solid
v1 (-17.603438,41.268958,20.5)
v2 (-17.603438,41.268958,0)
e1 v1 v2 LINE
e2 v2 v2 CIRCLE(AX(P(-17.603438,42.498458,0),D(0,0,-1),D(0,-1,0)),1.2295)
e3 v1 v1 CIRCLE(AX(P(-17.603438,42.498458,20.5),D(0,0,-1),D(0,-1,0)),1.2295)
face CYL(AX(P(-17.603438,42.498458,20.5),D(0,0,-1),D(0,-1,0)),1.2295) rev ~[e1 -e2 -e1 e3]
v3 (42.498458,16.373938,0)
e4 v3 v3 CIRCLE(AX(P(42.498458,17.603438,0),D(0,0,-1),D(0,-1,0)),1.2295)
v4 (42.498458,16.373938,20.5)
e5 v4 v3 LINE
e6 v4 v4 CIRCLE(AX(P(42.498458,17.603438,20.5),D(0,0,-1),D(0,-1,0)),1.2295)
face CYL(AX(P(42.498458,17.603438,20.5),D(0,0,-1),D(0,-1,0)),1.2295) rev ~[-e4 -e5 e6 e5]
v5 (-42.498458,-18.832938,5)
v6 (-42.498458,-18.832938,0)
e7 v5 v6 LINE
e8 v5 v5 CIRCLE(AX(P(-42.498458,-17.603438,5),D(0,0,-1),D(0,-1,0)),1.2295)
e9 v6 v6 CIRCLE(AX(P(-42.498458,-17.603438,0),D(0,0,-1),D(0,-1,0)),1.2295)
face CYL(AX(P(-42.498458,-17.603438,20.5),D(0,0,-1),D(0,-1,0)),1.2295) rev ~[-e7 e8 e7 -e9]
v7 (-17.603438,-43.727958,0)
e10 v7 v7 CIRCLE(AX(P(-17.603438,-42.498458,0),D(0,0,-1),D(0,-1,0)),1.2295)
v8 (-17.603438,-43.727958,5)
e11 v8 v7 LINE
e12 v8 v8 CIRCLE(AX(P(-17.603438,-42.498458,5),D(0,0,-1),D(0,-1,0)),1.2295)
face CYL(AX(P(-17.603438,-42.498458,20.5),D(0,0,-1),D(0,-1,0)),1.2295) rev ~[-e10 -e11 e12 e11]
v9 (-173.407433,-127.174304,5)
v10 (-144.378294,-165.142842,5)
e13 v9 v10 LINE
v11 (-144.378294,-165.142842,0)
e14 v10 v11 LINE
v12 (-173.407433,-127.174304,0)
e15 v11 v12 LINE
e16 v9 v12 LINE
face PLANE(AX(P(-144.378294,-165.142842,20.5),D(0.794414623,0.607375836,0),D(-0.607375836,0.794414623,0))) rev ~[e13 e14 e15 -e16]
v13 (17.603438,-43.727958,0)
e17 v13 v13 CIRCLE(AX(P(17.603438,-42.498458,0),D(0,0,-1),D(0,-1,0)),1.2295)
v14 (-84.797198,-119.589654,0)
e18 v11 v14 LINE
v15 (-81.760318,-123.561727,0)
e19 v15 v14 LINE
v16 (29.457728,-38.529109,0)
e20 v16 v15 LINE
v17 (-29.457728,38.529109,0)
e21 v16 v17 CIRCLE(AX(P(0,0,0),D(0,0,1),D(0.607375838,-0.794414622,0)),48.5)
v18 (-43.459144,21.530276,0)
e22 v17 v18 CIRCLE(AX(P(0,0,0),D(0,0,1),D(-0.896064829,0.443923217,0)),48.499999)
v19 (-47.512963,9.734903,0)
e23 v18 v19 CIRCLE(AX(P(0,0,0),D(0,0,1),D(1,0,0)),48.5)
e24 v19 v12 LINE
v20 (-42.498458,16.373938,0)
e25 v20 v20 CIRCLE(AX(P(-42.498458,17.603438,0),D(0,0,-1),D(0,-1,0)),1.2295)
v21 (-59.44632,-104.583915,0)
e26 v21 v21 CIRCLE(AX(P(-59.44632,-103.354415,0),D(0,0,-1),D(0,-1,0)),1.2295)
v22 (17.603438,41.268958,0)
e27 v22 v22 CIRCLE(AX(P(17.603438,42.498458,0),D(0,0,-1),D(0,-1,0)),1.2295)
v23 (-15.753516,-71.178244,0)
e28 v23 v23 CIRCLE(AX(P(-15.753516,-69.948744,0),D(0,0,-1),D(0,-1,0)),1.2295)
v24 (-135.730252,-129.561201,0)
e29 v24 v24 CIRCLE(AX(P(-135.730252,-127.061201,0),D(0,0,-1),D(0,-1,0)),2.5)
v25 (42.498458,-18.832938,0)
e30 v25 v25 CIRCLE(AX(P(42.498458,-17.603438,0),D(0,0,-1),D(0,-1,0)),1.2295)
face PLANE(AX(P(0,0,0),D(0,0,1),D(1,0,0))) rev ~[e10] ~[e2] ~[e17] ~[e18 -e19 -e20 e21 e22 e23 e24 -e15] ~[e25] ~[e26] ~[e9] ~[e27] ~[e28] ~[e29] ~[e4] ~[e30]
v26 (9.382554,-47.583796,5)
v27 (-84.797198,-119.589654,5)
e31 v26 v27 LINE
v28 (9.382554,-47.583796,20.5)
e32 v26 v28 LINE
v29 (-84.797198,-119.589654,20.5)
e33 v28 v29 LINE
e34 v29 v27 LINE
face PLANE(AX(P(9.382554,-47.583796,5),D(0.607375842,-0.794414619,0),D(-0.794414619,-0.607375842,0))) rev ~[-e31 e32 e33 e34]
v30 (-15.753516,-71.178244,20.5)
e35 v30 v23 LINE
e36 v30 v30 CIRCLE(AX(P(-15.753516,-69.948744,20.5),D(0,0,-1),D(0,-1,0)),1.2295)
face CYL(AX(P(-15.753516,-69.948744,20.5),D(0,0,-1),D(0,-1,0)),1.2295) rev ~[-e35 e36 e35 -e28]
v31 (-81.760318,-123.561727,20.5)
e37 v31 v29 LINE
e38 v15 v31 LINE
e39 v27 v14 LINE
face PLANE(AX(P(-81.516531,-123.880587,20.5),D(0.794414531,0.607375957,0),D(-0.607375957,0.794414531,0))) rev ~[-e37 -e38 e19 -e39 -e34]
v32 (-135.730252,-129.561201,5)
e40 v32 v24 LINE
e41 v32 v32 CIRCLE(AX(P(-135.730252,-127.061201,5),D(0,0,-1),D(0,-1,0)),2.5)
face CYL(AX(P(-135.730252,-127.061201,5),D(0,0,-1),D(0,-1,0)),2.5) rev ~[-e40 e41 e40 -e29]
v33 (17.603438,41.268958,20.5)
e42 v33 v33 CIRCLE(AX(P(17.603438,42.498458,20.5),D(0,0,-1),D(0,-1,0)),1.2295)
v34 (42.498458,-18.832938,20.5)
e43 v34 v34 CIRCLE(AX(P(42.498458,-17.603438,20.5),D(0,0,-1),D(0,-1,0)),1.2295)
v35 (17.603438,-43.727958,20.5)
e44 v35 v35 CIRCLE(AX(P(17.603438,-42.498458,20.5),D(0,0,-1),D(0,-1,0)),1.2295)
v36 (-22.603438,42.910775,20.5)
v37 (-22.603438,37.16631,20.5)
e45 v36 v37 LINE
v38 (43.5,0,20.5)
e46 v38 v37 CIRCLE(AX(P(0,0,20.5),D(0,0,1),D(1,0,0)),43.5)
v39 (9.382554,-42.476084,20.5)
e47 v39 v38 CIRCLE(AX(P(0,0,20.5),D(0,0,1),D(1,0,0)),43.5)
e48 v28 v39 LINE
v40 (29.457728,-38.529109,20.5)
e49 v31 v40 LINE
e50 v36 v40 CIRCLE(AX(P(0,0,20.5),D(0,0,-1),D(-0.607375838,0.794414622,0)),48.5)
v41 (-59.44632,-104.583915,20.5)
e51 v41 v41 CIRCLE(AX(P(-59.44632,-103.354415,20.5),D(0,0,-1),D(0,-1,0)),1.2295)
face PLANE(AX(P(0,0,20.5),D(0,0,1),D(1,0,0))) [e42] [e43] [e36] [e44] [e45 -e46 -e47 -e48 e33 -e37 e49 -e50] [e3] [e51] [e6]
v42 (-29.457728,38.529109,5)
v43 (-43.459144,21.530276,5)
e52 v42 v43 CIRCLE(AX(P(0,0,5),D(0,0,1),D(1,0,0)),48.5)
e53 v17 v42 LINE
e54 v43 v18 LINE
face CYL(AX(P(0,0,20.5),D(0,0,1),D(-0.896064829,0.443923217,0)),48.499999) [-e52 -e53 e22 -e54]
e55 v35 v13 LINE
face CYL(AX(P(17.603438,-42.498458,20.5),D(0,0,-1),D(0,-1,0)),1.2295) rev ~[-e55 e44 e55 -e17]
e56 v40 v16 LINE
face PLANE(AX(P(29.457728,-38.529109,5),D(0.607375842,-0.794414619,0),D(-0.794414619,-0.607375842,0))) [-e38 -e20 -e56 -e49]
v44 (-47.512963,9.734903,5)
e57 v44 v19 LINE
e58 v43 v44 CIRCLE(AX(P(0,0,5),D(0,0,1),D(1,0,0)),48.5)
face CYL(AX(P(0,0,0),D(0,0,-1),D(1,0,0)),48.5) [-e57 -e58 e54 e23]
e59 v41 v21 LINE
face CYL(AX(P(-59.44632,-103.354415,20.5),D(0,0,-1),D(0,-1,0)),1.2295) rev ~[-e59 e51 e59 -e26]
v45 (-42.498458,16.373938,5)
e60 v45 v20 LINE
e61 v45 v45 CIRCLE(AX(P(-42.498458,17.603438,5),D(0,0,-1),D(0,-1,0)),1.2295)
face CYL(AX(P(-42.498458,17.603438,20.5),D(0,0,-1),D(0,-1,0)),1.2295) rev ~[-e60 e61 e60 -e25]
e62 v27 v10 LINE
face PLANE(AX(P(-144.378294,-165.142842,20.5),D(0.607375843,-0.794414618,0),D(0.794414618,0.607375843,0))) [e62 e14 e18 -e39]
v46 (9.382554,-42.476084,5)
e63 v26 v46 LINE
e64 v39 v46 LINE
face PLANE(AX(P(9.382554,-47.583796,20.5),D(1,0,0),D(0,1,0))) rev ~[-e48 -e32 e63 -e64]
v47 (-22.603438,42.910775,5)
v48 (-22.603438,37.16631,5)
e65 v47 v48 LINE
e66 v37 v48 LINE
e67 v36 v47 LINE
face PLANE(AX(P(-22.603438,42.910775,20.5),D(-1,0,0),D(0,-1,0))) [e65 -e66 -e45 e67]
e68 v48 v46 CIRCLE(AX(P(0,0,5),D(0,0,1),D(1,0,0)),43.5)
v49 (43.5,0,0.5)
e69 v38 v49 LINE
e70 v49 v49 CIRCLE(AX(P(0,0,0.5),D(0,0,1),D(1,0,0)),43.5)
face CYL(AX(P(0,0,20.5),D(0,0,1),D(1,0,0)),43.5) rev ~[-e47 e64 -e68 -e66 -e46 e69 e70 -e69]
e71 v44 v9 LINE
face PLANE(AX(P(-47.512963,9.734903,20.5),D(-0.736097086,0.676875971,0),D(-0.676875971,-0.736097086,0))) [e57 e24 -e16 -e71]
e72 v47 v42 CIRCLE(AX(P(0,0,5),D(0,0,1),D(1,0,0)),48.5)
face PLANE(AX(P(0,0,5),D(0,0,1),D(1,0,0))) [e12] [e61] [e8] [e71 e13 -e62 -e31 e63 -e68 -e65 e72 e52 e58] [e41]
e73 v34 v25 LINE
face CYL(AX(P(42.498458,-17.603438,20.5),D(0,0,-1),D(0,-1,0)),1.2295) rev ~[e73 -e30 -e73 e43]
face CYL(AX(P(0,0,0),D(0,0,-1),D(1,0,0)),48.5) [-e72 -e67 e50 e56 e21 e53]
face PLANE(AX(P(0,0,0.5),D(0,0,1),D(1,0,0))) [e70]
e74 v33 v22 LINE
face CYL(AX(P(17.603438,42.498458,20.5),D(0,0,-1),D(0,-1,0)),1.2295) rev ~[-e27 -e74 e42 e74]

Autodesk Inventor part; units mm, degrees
ref_plane "YZ Plane" through (0, 0, 0) normal (1, 0, 0) x (0, 1, 0)
ref_plane "XZ Plane" through (0, 0, 0) normal (0, 1, 0) x (-1, 0, 0)
ref_plane "XY Plane" through (0, 0, 0) normal (0, 0, 1) x (1, 0, 0)
sketch "スケッチ1" plane through (0, 0, 0) normal (0, 0, 1) x (1, 0, 0)
  circle A0 centre (0, 0) radius 48.5
  circle A1 centre (0, 0) radius 46
  dimension "d0" = 97
  dimension "d1" = 92
extrude "押し出し1" add sketch "スケッチ1" along normal blind 20.5 contours A0 | A1
sketch "スケッチ2" plane through (0, 0, 20.5) normal (0, 0, 1) x (1, 0, 0)
  circle A0 centre (0, 0) radius 46
  line L0 (0, 0) -> (0, 59.211017)
  line L1 (0, 0) -> (-21.860946, 52.776992)
  line L2 (0, 0) -> (27.822621, 47.858094)
  point P0 (-17.603438, 42.498458)
  point P1 (-42.498458, 17.603438)
  point P2 (-42.498458, -17.603438)
  point P3 (-17.603438, -42.498458)
  point P4 (17.603438, -42.498458)
  point P5 (42.498458, -17.603438)
  point P6 (42.498458, 17.603438)
  point P7 (17.603438, 42.498458)
  dimension "d4" = 92
  dimension "d5" = 22.5
  dimension "d8" = 360
hole "穴1" at (-17.603438, 42.498458, 20.5) at (-42.498458, 17.603438, 20.5) at (-42.498458, -17.603438, 20.5) at (-17.603438, -42.498458, 20.5) at (17.603438, -42.498458, 20.5) at (42.498458, -17.603438, 20.5) at (42.498458, 17.603438, 20.5) at (17.603438, 42.498458, 20.5) direction (0, 0, -1) diameter 2.459 end through all
sketch "スケッチ3" plane through (0, 0, 20.5) normal (0, 0, 1) x (1, 0, 0)
  circle A0 centre (0, 0) radius 43.5
  dimension "d17" = 87
extrude "押し出し2" cut sketch "スケッチ3" against normal blind 20
sketch "スケッチ4" plane through (0, 0, 0) normal (0, 0, -1) x (-1, 0, 0)
  line L0 (0, 0) -> (0, -80.557014)
  circle A0 centre (0, 0) radius 48.5
  line L1 (-29.457728, -38.529109) -> (145.313488, -172.151794)
  line L2 (29.457728, 38.529109) -> (204.228945, -95.093576)
  line L3 (145.313488, -172.151794) -> (204.228945, -95.093576)
  point P0 (29.457728, 38.529109)
  dimension "d21" = 48.5
  dimension "d23" = 97
  dimension "d24" = 220
  dimension "d25" = 220
  dimension "d56" = 52.6
extrude "押し出し3" add sketch "スケッチ4" against normal blind 5 contours A0 L2 L3 L1 L0 | L0 L1 A0
sketch "スケッチ5" plane through (0, 0, 5) normal (0, 0, 1) x (1, 0, 0)
  line L0 (-29.457728, 38.529109) -> (29.457728, -38.529109)
  line L1 (-204.228945, -95.093576) -> (-145.313488, -172.151794)
  line L2 (29.457728, -38.529109) -> (-145.313488, -172.151794)
  line L3 (-145.313488, -172.151794) -> (-204.228945, -95.093576)
  line L4 (-204.228945, -95.093576) -> (-29.457728, 38.529109)
  line L5 (-26.420849, 34.557036) -> (-201.192066, -99.065649)
  line L6 (26.420849, -34.557036) -> (-148.350367, -168.179721)
  line L7 (-200.256872, -92.056696) -> (-141.341415, -169.114915)
  circle A0 centre (0, 0) radius 48.5
  circle A1 centre (0, 0) radius 43.5
  point P0 (-116.843336, -28.282233)
  point P1 (-60.964759, -101.368378)
  point P2 (-57.92788, -105.340451)
  point P3 (-174.771217, -133.622685)
  point P4 (-170.799143, -130.585806)
  point P5 (-174.771217, -133.622685)
  point P6 (-43.459144, 21.530276)
  point P7 (9.382554, -47.583796)
  point P8 (-144.378294, -165.142842)
  point P9 (-197.219992, -96.02877)
  dimension "d29" = 5
  dimension "d30" = 5
  dimension "d32" = 5
  dimension "d33" = 5
extrude "押し出し4" add sketch "スケッチ5" along normal blind 15.5 contours A0 L5 L7 L4 | L7 L5 L1 L4 | L7 L6 L1 L5 | L2 L7 L6 A0 | L7 L2 L1 L6
sketch "スケッチ6" plane through (0, 0, 20.5) normal (0, 0, 1) x (1, 0, 0)
  line L0 (-204.228945, -95.093576) -> (-145.313488, -172.151794)
  arc A0 (29.457728, -38.529109) -> (-29.457728, 38.529109) centre (0, 0) ccw
  line L1 (-29.457728, 38.529109) -> (-204.228945, -95.093576)
  line L2 (-145.313488, -172.151794) -> (29.457728, -38.529109)
  point P0 (-15.753516, -69.948744)
  point P1 (-71.632093, 3.137401)
  point P2 (-59.44632, -103.354415)
  point P3 (-115.324897, -30.26827)
  point P4 (-103.139124, -136.760086)
  point P5 (-159.017701, -63.673941)
  point P6 (-174.771217, -133.622685)
  point P7 (38.529109, 29.457728)
  point P8 (9.382554, -47.583796)
  dimension "d36" = 268.5
  dimension "d37" = 55
  dimension "d38" = 55
  dimension "d39" = 55
  dimension "d40" = 2.5
  dimension "d41" = 2.5
  dimension "d42" = 2.5
  dimension "d43" = 55
  dimension "d44" = 55
  dimension "d45" = 55
  dimension "d46" = 2.5
  dimension "d47" = 2.5
  dimension "d48" = 2.5
hole "穴2" at (-15.753516, -69.948744, 20.5) at (-71.632093, 3.137401, 20.5) at (-59.44632, -103.354415, 20.5) at (-115.324897, -30.26827, 20.5) at (-103.139124, -136.760086, 20.5) at (-159.017701, -63.673941, 20.5) direction (0, 0, -1) diameter 2.459 end through all
sketch "スケッチ7" plane through (0, 0, 5) normal (0, 0, 1) x (1, 0, 0)
  line L0 (9.382554, -47.583796) -> (-144.378294, -165.142842)
  line L1 (-144.378294, -165.142842) -> (-197.219992, -96.02877)
  point P0 (0, 0)
  point P1 (-135.730252, -127.061201)
  dimension "d57" = 25
  dimension "d58" = 30
hole "穴3" at (-135.730252, -127.061201, 5) direction (0, 0, -1) diameter 5 end through all
sketch "スケッチ8" plane through (0, 0, 5) normal (0, 0, 1) x (1, 0, 0)
  line L0 (-204.228945, -95.093576) -> (-29.457728, 38.529109)
  line L1 (29.457728, -38.529109) -> (-145.313488, -172.151794)
  line L2 (-204.228945, -95.093576) -> (-145.313488, -172.151794)
  line L3 (-145.313488, -172.151794) -> (-204.228945, -95.093576)
  line L4 (29.457728, -38.529109) -> (-145.313488, -172.151794)
  arc A0 (-43.459144, 21.530276) -> (9.382554, -47.583796) centre (0, 0) ccw
  line L5 (-43.459144, 21.530276) -> (-176.491161, -123.140956)
  line L6 (-197.219992, -96.02877) -> (-144.378294, -165.142842)
  line L7 (-47.512963, 9.734903) -> (-173.407433, -127.174304)
  dimension "d66" = 80
  dimension "d67" = 5
extrude "押し出し5" add sketch "スケッチ8" along normal blind 10
sketch "スケッチ9" plane through (0, 0, 20.5) normal (0, 0, 1) x (1, 0, 0)
  circle A0 centre (0, 0) radius 48.5
  line L0 (-29.457728, 38.529109) -> (-204.228945, -95.093576)
  line L1 (-29.457728, 38.529109) -> (-204.228945, -95.093576)
  line L2 (-204.228945, -95.093576) -> (-144.905471, -172.685458)
  line L3 (-43.459144, 21.530276) -> (-179.92775, -126.878218)
  line L4 (-43.459144, 21.530276) -> (-176.491161, -123.140956)
  dimension "d70" = 97
  dimension "d71" = 80
  dimension "d72" = 0
sketch "スケッチ9 outline for 押し出し6" plane through (0, 0, 20.5) normal (0, 0, 1) x (1, 0, 0)
  line L0 (-179.92775, -126.878218) -> (-43.459144, 21.530276)
  line L1 (-204.228945, -95.093576) -> (-179.92775, -126.878218)
  line L2 (-29.457728, 38.529109) -> (-204.228945, -95.093576)
  arc A0 (-43.459144, 21.530276) -> (-29.457728, 38.529109) centre (0, 0) cw
extrude "押し出し6" cut sketch "スケッチ9 outline for 押し出し6" against normal through all
sketch "スケッチ10" plane through (0, 0, 20.5) normal (0, 0, 1) x (1, 0, 0)
  line L0 (-47.512963, 9.734903) -> (-173.407433, -127.174304)
  line L1 (-65.245855, -9.549472) -> (-68.329583, -5.516124)
  line L2 (-176.491161, -123.140956) -> (-179.92775, -126.878218)
  line L3 (-144.378294, -165.142842) -> (-173.407433, -127.174304)
  line L4 (-173.407433, -127.174304) -> (-176.527747, -123.093103)
  line L5 (-158.56619, -111.034574) -> (-161.649918, -107.001226)
  line L6 (-68.329583, -5.516124) -> (-161.649918, -107.001226)
  line L7 (-158.56619, -111.034574) -> (-65.245855, -9.549472)
  circle A0 centre (0, 0) radius 48.5
  line L8 (-43.459144, 21.530276) -> (-68.329583, -5.516124)
  line L9 (-47.512963, 9.734903) -> (-65.245855, -9.549472)
  line L10 (-158.56619, -111.034574) -> (-173.407433, -127.174304)
  line L11 (-144.378294, -165.142842) -> (-173.407433, -127.174304)
  line L12 (-179.92775, -126.878218) -> (-145.069701, -172.470655)
  line L13 (-144.378294, -165.142842) -> (9.382554, -47.583796)
  line L14 (-145.069701, -172.470655) -> (-81.516531, -123.880587)
  line L15 (-161.649918, -107.001226) -> (-179.92775, -126.878218)
  line L16 (-81.516531, -123.880587) -> (-84.797198, -119.589654)
  line L17 (9.382554, -47.583796) -> (9.382554, -42.583206)
  line L18 (-35.700709, 32.828485) -> (-32.020223, 29.444105)
  circle A1 centre (0, 0) radius 43.5
  circle A2 centre (0, 0) radius 43.5
  dimension "d75" = 97
  dimension "d78" = 80
  dimension "d79" = 87
  dimension "d80" = 5
extrude "押し出し7" cut sketch "スケッチ10" against normal through all contours L0 L1 L8 A0 | L0 L5 L6 L1 | L0 L4 L15 L5 | L16 L14 L12 L2 L4 L3 L13
sketch "スケッチ11" plane through (0, 0, 20.5) normal (0, 0, 1) x (1, 0, 0)
  circle A0 centre (0, 0) radius 43.5
  circle A1 centre (0, 0) radius 48.5
  line L0 (-22.603438, 42.910775) -> (-22.603438, 37.16631)
  circle A2 centre (-17.603438, 42.498458) radius 1.2295
  arc A3 (-47.512963, 9.734903) -> (9.382554, -47.583796) centre (0, 0) ccw
  line L1 (9.382554, -47.583796) -> (9.382554, -42.476084)
  point P0 (-22.603438, 40.038542)
  dimension "d81" = 87
  dimension "d82" = 97
  dimension "d83" = 5
extrude "押し出し8" cut sketch "スケッチ11" against normal blind 15.5 contours A0 L1 A1 L0 picked at (-35.223195, -30.551112)
equation "\"d25\" = d24"
equation "\"d41\" = d40"
equation "\"d42\" = d41"
equation "\"d43\" = d37"
equation "\"d44\" = d43"
equation "\"d45\" = d44"
equation "\"d46\" = d40"
equation "\"d47\" = d46"
equation "\"d48\" = d46"
properties part number "legparts_05"
